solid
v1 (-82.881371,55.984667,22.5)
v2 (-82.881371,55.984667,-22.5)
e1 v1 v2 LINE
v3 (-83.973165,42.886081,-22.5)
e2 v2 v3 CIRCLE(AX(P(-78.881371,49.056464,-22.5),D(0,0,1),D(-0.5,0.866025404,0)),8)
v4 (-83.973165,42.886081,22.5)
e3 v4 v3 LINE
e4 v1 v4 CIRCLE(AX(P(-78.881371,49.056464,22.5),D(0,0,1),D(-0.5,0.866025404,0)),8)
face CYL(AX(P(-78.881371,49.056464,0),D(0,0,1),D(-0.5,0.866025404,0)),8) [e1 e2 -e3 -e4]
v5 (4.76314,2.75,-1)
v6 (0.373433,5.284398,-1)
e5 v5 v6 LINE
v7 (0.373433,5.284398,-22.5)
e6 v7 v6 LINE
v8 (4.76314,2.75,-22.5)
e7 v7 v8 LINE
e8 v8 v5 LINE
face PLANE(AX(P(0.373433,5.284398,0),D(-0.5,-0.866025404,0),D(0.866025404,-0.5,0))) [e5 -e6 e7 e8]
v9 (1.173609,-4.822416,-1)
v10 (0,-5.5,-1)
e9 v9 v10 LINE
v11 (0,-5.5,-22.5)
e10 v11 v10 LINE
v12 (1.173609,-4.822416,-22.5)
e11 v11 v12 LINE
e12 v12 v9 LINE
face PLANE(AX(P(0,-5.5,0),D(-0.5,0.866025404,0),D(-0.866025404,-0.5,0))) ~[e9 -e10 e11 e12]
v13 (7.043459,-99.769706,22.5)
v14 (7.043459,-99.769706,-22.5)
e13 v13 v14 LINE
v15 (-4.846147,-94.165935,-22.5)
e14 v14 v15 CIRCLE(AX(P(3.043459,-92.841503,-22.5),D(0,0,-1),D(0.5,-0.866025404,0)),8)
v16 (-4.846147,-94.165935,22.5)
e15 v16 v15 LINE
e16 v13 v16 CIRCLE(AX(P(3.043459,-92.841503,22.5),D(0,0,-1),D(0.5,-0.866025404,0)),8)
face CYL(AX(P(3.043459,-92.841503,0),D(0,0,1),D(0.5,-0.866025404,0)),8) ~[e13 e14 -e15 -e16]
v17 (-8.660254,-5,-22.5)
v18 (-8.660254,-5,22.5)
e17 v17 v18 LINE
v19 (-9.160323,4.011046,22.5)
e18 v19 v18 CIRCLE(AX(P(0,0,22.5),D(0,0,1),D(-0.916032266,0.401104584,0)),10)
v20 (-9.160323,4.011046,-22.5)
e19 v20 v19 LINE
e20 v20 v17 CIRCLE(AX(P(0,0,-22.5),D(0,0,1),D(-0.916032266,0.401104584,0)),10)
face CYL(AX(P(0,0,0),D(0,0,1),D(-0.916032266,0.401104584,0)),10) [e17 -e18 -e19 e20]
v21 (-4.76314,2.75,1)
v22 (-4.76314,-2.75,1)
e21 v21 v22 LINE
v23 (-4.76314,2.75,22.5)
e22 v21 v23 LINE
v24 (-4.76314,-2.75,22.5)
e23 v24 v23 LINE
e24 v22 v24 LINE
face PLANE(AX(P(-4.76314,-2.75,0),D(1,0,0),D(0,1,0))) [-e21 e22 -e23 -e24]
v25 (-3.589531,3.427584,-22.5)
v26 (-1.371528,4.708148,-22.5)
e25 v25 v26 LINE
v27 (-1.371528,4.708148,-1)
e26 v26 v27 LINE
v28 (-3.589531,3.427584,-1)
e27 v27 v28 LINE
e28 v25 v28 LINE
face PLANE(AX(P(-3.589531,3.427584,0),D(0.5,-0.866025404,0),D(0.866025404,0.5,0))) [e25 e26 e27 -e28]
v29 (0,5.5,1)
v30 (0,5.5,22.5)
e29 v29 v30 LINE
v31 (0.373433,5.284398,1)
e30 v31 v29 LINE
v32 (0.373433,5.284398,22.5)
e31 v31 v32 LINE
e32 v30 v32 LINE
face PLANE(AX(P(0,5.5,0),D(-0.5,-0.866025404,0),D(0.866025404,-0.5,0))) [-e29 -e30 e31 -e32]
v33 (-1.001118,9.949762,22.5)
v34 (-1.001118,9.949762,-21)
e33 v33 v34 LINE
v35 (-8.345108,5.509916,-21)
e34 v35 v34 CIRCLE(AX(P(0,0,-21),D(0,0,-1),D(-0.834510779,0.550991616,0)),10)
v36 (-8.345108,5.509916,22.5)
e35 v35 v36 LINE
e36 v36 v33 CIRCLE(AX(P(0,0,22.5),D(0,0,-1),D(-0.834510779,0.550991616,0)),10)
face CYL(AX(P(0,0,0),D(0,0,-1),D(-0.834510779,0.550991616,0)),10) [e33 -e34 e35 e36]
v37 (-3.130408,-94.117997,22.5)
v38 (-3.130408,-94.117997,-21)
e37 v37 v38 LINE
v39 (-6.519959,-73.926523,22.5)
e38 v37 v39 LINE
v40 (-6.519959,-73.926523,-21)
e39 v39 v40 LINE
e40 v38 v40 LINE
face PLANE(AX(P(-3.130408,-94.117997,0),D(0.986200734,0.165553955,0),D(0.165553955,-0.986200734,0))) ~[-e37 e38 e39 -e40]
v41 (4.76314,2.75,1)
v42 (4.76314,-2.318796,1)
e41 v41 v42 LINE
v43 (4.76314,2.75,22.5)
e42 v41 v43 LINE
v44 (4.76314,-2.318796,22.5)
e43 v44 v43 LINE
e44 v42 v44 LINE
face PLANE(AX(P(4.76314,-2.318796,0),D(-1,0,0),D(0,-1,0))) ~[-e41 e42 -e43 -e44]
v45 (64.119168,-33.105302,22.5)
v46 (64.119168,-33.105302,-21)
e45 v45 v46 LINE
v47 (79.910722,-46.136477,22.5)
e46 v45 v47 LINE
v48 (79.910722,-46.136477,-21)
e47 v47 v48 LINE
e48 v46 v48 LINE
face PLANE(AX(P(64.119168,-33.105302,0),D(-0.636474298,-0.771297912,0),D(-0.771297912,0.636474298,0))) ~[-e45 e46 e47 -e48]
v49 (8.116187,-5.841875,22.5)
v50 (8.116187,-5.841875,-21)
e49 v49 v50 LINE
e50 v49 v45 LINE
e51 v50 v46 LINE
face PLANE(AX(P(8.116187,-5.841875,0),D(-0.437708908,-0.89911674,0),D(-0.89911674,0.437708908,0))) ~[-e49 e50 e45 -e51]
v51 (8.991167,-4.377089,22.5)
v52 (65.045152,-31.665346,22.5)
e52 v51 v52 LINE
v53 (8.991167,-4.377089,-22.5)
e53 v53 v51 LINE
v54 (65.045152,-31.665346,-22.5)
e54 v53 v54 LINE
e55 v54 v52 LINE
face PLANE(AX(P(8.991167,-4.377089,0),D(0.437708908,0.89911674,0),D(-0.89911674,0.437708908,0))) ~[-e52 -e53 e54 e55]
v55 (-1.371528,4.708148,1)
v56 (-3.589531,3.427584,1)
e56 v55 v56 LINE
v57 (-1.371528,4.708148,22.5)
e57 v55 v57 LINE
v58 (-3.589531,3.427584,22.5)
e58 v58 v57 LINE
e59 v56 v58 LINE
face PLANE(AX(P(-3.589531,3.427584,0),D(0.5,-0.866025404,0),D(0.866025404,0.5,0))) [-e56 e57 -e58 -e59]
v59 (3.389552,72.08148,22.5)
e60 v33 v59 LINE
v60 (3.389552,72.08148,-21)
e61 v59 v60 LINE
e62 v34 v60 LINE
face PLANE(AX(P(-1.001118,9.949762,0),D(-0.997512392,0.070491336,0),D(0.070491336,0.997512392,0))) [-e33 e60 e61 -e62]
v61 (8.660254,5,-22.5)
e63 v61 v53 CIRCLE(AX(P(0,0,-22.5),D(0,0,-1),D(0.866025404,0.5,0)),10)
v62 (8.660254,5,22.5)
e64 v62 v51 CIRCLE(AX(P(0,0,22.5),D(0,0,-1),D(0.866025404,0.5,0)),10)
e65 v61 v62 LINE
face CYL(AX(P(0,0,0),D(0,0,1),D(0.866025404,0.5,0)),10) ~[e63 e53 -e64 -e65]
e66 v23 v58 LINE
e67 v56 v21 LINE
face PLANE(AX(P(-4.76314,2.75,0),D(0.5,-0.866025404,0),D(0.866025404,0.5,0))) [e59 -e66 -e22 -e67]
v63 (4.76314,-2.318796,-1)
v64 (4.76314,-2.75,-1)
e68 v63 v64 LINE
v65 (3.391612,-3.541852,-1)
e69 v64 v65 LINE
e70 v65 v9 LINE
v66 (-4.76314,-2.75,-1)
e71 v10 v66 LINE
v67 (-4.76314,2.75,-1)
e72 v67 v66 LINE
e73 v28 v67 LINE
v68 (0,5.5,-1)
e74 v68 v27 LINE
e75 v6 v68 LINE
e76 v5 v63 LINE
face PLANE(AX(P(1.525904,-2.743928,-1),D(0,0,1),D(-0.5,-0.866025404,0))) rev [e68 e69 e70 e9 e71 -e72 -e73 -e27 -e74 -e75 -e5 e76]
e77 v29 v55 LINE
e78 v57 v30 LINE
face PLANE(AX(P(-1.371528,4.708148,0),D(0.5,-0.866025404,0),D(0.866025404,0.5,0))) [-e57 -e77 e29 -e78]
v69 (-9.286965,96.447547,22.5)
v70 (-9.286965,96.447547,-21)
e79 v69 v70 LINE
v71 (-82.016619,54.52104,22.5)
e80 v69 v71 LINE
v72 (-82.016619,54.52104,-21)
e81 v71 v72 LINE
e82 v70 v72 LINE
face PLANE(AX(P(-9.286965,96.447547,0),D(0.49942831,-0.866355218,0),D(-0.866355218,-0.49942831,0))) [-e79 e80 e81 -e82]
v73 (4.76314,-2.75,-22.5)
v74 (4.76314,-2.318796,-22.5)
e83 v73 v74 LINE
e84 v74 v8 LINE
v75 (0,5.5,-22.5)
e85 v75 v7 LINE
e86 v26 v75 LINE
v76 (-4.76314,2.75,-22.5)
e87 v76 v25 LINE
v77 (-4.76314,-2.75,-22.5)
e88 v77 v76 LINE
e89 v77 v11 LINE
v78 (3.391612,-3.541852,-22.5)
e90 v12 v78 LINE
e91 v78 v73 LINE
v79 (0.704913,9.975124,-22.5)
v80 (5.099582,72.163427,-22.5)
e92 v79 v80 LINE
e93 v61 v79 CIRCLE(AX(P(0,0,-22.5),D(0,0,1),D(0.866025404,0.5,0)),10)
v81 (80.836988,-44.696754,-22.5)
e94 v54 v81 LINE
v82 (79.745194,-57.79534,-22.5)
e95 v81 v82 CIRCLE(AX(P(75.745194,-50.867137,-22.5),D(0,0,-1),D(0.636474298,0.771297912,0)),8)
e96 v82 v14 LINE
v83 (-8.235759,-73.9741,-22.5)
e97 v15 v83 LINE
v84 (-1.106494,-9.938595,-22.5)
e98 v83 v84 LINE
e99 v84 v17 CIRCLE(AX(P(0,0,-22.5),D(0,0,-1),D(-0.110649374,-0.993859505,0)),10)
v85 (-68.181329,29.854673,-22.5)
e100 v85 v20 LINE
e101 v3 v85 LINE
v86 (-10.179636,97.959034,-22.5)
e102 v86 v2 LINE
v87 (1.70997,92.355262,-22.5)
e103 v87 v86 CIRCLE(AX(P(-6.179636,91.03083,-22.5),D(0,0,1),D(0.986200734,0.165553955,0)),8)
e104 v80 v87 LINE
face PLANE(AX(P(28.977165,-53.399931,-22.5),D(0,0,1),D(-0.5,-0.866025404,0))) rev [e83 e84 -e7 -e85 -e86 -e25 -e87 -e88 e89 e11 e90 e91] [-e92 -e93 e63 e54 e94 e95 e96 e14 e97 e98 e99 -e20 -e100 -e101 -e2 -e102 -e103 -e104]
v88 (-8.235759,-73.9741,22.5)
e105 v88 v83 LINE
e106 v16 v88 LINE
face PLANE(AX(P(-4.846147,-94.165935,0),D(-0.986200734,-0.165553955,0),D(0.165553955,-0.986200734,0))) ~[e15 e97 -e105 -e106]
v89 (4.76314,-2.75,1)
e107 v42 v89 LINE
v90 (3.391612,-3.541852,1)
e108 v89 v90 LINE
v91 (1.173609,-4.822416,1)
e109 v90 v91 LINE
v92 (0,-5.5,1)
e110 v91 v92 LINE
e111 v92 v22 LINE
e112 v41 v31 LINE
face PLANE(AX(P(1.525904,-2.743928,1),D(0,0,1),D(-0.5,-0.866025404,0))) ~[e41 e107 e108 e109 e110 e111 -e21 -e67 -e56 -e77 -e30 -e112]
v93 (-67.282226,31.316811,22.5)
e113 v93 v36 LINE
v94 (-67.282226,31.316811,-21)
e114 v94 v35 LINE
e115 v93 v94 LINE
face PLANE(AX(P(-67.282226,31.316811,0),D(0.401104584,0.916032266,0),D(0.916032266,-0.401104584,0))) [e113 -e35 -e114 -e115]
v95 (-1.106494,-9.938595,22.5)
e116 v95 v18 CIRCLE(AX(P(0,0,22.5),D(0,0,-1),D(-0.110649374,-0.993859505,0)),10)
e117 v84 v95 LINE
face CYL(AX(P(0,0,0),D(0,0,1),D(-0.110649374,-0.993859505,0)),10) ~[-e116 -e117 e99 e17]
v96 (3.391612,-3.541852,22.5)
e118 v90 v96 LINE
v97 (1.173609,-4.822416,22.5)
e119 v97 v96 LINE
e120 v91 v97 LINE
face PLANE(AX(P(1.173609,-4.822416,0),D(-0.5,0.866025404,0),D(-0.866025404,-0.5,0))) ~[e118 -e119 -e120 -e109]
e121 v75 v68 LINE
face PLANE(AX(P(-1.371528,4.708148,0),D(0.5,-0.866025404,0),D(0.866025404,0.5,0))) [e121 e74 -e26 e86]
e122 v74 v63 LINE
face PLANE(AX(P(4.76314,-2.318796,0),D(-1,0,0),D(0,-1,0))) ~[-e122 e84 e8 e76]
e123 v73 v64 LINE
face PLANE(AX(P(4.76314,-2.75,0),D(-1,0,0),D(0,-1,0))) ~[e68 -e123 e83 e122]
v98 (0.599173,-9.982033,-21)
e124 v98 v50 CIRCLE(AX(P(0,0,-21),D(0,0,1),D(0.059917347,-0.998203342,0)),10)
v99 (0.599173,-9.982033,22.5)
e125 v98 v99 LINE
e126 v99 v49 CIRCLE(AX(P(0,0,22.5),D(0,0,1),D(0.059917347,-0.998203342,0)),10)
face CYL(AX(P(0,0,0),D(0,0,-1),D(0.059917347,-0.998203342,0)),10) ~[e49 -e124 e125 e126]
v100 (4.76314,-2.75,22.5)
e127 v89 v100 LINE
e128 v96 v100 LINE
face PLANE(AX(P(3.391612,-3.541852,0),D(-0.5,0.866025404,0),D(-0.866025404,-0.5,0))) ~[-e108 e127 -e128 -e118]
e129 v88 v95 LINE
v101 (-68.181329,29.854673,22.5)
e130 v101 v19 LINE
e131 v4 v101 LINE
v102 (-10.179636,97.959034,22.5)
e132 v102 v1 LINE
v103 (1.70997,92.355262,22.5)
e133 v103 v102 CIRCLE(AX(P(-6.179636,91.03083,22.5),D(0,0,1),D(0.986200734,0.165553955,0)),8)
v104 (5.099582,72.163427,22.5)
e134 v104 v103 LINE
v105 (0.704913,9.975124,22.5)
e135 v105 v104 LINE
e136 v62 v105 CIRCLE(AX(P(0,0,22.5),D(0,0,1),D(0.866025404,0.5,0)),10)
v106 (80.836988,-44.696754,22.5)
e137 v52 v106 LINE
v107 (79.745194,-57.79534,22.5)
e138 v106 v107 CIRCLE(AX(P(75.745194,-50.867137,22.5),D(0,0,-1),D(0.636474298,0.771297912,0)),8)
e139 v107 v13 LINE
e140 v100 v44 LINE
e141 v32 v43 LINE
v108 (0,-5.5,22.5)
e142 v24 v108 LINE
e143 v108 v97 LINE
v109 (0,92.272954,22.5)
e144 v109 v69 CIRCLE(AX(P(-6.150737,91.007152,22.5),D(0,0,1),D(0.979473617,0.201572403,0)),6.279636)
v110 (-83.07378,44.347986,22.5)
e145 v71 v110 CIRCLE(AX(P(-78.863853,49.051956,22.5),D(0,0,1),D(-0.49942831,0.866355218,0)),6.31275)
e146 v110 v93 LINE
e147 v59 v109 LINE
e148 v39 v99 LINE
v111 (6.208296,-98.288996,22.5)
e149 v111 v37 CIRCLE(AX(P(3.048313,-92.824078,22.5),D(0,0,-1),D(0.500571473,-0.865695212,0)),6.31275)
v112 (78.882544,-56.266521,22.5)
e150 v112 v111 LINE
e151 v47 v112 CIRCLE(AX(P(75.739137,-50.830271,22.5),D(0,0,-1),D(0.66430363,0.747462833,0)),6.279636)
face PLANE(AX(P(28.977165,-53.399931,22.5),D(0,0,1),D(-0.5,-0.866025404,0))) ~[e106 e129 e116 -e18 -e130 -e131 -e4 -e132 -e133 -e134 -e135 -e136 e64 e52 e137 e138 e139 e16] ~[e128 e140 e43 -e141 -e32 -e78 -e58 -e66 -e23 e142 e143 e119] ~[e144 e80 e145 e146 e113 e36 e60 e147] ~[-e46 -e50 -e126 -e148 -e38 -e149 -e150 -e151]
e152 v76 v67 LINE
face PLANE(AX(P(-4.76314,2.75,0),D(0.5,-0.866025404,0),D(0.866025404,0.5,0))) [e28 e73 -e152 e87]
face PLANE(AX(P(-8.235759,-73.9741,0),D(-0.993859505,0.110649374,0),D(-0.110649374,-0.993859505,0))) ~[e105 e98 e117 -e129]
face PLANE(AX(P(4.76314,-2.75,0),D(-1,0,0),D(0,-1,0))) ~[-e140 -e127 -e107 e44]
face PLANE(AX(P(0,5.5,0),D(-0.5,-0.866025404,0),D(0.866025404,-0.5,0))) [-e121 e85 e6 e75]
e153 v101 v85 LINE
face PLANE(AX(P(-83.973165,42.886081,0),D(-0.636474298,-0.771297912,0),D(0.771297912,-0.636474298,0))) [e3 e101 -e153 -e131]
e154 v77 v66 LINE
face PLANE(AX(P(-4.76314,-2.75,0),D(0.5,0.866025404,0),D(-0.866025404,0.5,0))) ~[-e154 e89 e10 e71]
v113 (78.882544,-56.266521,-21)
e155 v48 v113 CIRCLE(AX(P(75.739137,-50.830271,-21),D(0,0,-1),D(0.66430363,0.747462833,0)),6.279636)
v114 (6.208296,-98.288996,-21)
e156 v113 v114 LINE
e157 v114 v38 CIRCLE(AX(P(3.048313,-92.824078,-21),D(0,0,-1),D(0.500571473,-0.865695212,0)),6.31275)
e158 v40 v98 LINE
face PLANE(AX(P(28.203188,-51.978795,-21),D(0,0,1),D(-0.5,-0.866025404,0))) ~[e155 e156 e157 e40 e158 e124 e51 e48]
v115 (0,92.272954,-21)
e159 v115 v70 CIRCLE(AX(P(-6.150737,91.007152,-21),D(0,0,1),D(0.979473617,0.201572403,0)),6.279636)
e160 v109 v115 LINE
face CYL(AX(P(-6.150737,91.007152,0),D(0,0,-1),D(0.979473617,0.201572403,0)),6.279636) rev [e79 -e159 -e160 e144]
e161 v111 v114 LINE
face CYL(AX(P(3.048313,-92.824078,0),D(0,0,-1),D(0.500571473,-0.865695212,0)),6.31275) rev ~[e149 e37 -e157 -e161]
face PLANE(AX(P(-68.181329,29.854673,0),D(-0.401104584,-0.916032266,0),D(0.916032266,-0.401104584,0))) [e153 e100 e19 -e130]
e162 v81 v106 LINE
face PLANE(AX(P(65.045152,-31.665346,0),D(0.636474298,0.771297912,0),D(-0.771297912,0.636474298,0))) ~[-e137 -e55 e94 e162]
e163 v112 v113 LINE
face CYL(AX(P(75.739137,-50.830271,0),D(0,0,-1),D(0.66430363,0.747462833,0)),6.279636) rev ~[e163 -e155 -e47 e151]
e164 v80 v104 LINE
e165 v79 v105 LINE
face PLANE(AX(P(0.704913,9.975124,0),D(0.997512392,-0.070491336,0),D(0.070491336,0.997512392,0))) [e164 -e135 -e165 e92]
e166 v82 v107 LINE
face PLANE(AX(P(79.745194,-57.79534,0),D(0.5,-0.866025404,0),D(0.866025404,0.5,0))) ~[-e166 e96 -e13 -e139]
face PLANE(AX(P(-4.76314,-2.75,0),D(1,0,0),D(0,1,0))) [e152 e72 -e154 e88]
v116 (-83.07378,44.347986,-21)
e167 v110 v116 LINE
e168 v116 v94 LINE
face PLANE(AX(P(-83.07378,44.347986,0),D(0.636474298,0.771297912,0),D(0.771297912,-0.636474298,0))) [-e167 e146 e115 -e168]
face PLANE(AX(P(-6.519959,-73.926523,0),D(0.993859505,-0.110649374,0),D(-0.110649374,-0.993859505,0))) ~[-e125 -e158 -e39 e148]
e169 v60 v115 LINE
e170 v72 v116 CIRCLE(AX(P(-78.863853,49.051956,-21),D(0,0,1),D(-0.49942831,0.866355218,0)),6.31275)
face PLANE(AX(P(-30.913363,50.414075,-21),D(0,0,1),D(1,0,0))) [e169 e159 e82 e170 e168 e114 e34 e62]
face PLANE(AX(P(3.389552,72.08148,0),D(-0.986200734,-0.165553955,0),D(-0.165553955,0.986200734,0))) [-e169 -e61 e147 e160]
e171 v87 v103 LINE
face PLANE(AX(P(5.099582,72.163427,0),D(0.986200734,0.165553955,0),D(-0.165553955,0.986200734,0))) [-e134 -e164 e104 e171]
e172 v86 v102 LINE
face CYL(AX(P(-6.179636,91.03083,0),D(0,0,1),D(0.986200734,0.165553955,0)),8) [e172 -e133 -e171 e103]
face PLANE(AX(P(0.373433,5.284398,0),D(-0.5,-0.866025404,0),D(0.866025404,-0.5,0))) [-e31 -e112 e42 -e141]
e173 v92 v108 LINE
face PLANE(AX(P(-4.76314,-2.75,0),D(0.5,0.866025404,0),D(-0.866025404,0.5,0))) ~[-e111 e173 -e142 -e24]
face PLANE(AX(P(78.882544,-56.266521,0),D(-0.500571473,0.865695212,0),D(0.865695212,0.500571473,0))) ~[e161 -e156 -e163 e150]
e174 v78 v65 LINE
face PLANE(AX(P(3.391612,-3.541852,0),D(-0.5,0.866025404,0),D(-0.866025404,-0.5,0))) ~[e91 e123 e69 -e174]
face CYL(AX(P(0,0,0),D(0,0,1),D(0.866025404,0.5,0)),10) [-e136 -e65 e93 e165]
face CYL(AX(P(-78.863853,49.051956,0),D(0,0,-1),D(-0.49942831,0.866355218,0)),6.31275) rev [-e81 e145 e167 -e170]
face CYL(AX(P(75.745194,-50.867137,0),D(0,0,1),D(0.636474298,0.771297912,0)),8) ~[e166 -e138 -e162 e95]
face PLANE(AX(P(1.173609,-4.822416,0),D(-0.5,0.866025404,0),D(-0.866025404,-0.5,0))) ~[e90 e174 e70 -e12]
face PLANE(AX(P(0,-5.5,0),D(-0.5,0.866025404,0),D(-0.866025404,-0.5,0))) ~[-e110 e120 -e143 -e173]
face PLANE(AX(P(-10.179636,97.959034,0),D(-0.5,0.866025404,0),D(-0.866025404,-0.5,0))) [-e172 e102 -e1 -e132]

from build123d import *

# Parameters (mm, degrees)
F1_DEPTH = 22.5
F2_DEPTH = 22.5
F3_DEPTH = 21
F4_DEPTH = 1


# Not quite as in the source:
# - a feature names something its author has since deleted; it is built from what else it names


with BuildPart() as f1:
    # F0 (on Top) → F1 (new body, symmetric)
    with BuildSketch(Plane.XY):
        with BuildLine():
            Line((0.7049133584, 9.9751239169), (5.0995821323, 72.1634270217))
            Line((5.0995821323, 72.1634270217), (1.7099698283, 92.3552620466))
            ThreePointArc((1.7099698283, 92.3552620466), (-2.7689436701, 98.2673473553), (-10.179636045, 97.9590336386))
            Line((-10.179636045, 97.9590336386), (-82.8813710016, 55.9846673909))
            ThreePointArc((-82.8813710016, 55.9846673909), (-86.8537247, 49.720976393), (-83.9731653825, 42.8860808677))
            Line((-83.9731653825, 42.8860808677), (-68.1813294539, 29.8546729909))
            Line((-68.1813294539, 29.8546729909), (-9.1603226635, 4.0110458362))
            ThreePointArc((-9.1603226635, 4.0110458362), (-8.784741138, 4.7778994482), (-8.3451077857, 5.5099161558))
            Line((-8.3451077857, 5.5099161558), (-67.2822264653, 31.3168110829))
            Line((-67.2822264653, 31.3168110829), (-83.0737799078, 44.3479858524))
            ThreePointArc((-83.0737799078, 44.3479858524), (-85.1427917644, 49.7044488576), (-82.0166193538, 54.5210401885))
            Line((-82.0166193538, 54.5210401885), (-9.2869651685, 96.4475473538))
            ThreePointArc((-9.2869651685, 96.4475473538), (-3.5761256796, 96.734734482), (0, 92.2729535329))
            Line((0, 92.2729535329), (3.3895516703, 72.0814797017))
            Line((3.3895516703, 72.0814797017), (-1.0011183824, 9.9497619059))
            ThreePointArc((-1.0011183824, 9.9497619059), (-0.1486444145, 9.9988951809), (0.7049133584, 9.9751239169))
        make_face()
        with BuildLine():
            ThreePointArc((-9.1603226635, 4.0110458362), (-9.9846369617, -0.554098134), (-8.6602540378, -5))
            Line((-8.6602540378, -5), (-4.7631397208, -2.75))
            Line((-4.7631397208, -2.75), (-4.7631397208, 2.0856439719))
            Line((-4.7631397208, 2.0856439719), (-9.1603226635, 4.0110458362))
        make_face()
        with BuildLine():
            Line((4.7631397208, 2.75), (8.6602540378, 5))
            ThreePointArc((8.6602540378, 5), (5.3023159645, 8.4785284934), (0.7049133584, 9.9751239169))
            Line((0.7049133584, 9.9751239169), (0.373433245, 5.2843982155))
            Line((0.373433245, 5.2843982155), (4.7631397208, 2.75))
        make_face()
        with BuildLine():
            Line((-1.3715281953, 4.7081478273), (-1.0011183824, 9.9497619059))
            ThreePointArc((-1.0011183824, 9.9497619059), (-5.1735909645, 8.5576840636), (-8.3451077857, 5.5099161558))
            Line((-8.3451077857, 5.5099161558), (-3.589530539, 3.4275835771))
            Line((-3.589530539, 3.4275835771), (-1.3715281953, 4.7081478273))
        make_face()
        with BuildLine():
            Line((0.373433245, 5.2843982155), (0.7049133584, 9.9751239169))
            ThreePointArc((0.7049133584, 9.9751239169), (-0.1486444145, 9.9988951809), (-1.0011183824, 9.9497619059))
            Line((-1.0011183824, 9.9497619059), (-1.3715281953, 4.7081478273))
            Line((-1.3715281953, 4.7081478273), (0, 5.5))
            Line((0, 5.5), (0.373433245, 5.2843982155))
        make_face()
        with BuildLine():
            ThreePointArc((-8.3451077857, 5.5099161558), (-8.784741138, 4.7778994482), (-9.1603226635, 4.0110458362))
            Line((-9.1603226635, 4.0110458362), (-4.7631397208, 2.0856439719))
            Line((-4.7631397208, 2.0856439719), (-4.7631397208, 2.75))
            Line((-4.7631397208, 2.75), (-3.589530539, 3.4275835771))
            Line((-3.589530539, 3.4275835771), (-8.3451077857, 5.5099161558))
        make_face()
        with BuildLine():
            ThreePointArc((-8.3451077857, 5.5099161558), (-5.1735909645, 8.5576840636), (-1.0011183824, 9.9497619059))
            Line((-1.0011183824, 9.9497619059), (3.3895516703, 72.0814797017))
            Line((3.3895516703, 72.0814797017), (0, 92.2729535329))
            ThreePointArc((0, 92.2729535329), (-3.5761256796, 96.734734482), (-9.2869651685, 96.4475473538))
            Line((-9.2869651685, 96.4475473538), (-82.0166193538, 54.5210401885))
            ThreePointArc((-82.0166193538, 54.5210401885), (-85.1427917644, 49.7044488576), (-83.0737799078, 44.3479858524))
            Line((-83.0737799078, 44.3479858524), (-67.2822264653, 31.3168110829))
            Line((-67.2822264653, 31.3168110829), (-8.3451077857, 5.5099161558))
        make_face()
    extrude(amount=F1_DEPTH, both=True)

    # F0 (on Top) → F2 (cut, through all)
    with BuildSketch(Plane.XY):
        with BuildLine():
            ThreePointArc((-8.3451077857, 5.5099161558), (-5.1735909645, 8.5576840636), (-1.0011183824, 9.9497619059))
            Line((-1.0011183824, 9.9497619059), (3.3895516703, 72.0814797017))
            Line((3.3895516703, 72.0814797017), (0, 92.2729535329))
            ThreePointArc((0, 92.2729535329), (-3.5761256796, 96.734734482), (-9.2869651685, 96.4475473538))
            Line((-9.2869651685, 96.4475473538), (-82.0166193538, 54.5210401885))
            ThreePointArc((-82.0166193538, 54.5210401885), (-85.1427917644, 49.7044488576), (-83.0737799078, 44.3479858524))
            Line((-83.0737799078, 44.3479858524), (-67.2822264653, 31.3168110829))
            Line((-67.2822264653, 31.3168110829), (-8.3451077857, 5.5099161558))
        make_face()
    extrude(amount=F2_DEPTH, mode=Mode.SUBTRACT)

    # F0 (on Top) → F3 (cut)
    with BuildSketch(Plane.XY):
        with BuildLine():
            ThreePointArc((-8.3451077857, 5.5099161558), (-5.1735909645, 8.5576840636), (-1.0011183824, 9.9497619059))
            Line((-1.0011183824, 9.9497619059), (3.3895516703, 72.0814797017))
            Line((3.3895516703, 72.0814797017), (0, 92.2729535329))
            ThreePointArc((0, 92.2729535329), (-3.5761256796, 96.734734482), (-9.2869651685, 96.4475473538))
            Line((-9.2869651685, 96.4475473538), (-82.0166193538, 54.5210401885))
            ThreePointArc((-82.0166193538, 54.5210401885), (-85.1427917644, 49.7044488576), (-83.0737799078, 44.3479858524))
            Line((-83.0737799078, 44.3479858524), (-67.2822264653, 31.3168110829))
            Line((-67.2822264653, 31.3168110829), (-8.3451077857, 5.5099161558))
        make_face()
    extrude(amount=-F3_DEPTH, mode=Mode.SUBTRACT)

    # F0 (on Top) → F4 (join, symmetric)
    with BuildSketch(Plane.XY):
        Polygon((-4.7631397208, 2.0856439719), (0, 0), (0.373433245, 5.2843982155), (0, 5.5), (-1.3715281953, 4.7081478273), (-3.589530539, 3.4275835771), (-4.7631397208, 2.75), align=None)
        Polygon((0, 0), (4.7631397208, 2.75), (0.373433245, 5.2843982155), align=None)
        Polygon((-4.7631397208, 2.0856439719), (-4.7631397208, -2.75), (0, 0), align=None)
    extrude(amount=F4_DEPTH, both=True)

    # F5: F1 across face


with BuildPart() as f1_1:
    add(f1.part)
    add(f1.part.mirror(Plane(origin=(0, 0, 0), x_dir=(0.8660254038, 0.5, 0), z_dir=(0.5, -0.8660254038, 0))))


solid = f1_1.part
